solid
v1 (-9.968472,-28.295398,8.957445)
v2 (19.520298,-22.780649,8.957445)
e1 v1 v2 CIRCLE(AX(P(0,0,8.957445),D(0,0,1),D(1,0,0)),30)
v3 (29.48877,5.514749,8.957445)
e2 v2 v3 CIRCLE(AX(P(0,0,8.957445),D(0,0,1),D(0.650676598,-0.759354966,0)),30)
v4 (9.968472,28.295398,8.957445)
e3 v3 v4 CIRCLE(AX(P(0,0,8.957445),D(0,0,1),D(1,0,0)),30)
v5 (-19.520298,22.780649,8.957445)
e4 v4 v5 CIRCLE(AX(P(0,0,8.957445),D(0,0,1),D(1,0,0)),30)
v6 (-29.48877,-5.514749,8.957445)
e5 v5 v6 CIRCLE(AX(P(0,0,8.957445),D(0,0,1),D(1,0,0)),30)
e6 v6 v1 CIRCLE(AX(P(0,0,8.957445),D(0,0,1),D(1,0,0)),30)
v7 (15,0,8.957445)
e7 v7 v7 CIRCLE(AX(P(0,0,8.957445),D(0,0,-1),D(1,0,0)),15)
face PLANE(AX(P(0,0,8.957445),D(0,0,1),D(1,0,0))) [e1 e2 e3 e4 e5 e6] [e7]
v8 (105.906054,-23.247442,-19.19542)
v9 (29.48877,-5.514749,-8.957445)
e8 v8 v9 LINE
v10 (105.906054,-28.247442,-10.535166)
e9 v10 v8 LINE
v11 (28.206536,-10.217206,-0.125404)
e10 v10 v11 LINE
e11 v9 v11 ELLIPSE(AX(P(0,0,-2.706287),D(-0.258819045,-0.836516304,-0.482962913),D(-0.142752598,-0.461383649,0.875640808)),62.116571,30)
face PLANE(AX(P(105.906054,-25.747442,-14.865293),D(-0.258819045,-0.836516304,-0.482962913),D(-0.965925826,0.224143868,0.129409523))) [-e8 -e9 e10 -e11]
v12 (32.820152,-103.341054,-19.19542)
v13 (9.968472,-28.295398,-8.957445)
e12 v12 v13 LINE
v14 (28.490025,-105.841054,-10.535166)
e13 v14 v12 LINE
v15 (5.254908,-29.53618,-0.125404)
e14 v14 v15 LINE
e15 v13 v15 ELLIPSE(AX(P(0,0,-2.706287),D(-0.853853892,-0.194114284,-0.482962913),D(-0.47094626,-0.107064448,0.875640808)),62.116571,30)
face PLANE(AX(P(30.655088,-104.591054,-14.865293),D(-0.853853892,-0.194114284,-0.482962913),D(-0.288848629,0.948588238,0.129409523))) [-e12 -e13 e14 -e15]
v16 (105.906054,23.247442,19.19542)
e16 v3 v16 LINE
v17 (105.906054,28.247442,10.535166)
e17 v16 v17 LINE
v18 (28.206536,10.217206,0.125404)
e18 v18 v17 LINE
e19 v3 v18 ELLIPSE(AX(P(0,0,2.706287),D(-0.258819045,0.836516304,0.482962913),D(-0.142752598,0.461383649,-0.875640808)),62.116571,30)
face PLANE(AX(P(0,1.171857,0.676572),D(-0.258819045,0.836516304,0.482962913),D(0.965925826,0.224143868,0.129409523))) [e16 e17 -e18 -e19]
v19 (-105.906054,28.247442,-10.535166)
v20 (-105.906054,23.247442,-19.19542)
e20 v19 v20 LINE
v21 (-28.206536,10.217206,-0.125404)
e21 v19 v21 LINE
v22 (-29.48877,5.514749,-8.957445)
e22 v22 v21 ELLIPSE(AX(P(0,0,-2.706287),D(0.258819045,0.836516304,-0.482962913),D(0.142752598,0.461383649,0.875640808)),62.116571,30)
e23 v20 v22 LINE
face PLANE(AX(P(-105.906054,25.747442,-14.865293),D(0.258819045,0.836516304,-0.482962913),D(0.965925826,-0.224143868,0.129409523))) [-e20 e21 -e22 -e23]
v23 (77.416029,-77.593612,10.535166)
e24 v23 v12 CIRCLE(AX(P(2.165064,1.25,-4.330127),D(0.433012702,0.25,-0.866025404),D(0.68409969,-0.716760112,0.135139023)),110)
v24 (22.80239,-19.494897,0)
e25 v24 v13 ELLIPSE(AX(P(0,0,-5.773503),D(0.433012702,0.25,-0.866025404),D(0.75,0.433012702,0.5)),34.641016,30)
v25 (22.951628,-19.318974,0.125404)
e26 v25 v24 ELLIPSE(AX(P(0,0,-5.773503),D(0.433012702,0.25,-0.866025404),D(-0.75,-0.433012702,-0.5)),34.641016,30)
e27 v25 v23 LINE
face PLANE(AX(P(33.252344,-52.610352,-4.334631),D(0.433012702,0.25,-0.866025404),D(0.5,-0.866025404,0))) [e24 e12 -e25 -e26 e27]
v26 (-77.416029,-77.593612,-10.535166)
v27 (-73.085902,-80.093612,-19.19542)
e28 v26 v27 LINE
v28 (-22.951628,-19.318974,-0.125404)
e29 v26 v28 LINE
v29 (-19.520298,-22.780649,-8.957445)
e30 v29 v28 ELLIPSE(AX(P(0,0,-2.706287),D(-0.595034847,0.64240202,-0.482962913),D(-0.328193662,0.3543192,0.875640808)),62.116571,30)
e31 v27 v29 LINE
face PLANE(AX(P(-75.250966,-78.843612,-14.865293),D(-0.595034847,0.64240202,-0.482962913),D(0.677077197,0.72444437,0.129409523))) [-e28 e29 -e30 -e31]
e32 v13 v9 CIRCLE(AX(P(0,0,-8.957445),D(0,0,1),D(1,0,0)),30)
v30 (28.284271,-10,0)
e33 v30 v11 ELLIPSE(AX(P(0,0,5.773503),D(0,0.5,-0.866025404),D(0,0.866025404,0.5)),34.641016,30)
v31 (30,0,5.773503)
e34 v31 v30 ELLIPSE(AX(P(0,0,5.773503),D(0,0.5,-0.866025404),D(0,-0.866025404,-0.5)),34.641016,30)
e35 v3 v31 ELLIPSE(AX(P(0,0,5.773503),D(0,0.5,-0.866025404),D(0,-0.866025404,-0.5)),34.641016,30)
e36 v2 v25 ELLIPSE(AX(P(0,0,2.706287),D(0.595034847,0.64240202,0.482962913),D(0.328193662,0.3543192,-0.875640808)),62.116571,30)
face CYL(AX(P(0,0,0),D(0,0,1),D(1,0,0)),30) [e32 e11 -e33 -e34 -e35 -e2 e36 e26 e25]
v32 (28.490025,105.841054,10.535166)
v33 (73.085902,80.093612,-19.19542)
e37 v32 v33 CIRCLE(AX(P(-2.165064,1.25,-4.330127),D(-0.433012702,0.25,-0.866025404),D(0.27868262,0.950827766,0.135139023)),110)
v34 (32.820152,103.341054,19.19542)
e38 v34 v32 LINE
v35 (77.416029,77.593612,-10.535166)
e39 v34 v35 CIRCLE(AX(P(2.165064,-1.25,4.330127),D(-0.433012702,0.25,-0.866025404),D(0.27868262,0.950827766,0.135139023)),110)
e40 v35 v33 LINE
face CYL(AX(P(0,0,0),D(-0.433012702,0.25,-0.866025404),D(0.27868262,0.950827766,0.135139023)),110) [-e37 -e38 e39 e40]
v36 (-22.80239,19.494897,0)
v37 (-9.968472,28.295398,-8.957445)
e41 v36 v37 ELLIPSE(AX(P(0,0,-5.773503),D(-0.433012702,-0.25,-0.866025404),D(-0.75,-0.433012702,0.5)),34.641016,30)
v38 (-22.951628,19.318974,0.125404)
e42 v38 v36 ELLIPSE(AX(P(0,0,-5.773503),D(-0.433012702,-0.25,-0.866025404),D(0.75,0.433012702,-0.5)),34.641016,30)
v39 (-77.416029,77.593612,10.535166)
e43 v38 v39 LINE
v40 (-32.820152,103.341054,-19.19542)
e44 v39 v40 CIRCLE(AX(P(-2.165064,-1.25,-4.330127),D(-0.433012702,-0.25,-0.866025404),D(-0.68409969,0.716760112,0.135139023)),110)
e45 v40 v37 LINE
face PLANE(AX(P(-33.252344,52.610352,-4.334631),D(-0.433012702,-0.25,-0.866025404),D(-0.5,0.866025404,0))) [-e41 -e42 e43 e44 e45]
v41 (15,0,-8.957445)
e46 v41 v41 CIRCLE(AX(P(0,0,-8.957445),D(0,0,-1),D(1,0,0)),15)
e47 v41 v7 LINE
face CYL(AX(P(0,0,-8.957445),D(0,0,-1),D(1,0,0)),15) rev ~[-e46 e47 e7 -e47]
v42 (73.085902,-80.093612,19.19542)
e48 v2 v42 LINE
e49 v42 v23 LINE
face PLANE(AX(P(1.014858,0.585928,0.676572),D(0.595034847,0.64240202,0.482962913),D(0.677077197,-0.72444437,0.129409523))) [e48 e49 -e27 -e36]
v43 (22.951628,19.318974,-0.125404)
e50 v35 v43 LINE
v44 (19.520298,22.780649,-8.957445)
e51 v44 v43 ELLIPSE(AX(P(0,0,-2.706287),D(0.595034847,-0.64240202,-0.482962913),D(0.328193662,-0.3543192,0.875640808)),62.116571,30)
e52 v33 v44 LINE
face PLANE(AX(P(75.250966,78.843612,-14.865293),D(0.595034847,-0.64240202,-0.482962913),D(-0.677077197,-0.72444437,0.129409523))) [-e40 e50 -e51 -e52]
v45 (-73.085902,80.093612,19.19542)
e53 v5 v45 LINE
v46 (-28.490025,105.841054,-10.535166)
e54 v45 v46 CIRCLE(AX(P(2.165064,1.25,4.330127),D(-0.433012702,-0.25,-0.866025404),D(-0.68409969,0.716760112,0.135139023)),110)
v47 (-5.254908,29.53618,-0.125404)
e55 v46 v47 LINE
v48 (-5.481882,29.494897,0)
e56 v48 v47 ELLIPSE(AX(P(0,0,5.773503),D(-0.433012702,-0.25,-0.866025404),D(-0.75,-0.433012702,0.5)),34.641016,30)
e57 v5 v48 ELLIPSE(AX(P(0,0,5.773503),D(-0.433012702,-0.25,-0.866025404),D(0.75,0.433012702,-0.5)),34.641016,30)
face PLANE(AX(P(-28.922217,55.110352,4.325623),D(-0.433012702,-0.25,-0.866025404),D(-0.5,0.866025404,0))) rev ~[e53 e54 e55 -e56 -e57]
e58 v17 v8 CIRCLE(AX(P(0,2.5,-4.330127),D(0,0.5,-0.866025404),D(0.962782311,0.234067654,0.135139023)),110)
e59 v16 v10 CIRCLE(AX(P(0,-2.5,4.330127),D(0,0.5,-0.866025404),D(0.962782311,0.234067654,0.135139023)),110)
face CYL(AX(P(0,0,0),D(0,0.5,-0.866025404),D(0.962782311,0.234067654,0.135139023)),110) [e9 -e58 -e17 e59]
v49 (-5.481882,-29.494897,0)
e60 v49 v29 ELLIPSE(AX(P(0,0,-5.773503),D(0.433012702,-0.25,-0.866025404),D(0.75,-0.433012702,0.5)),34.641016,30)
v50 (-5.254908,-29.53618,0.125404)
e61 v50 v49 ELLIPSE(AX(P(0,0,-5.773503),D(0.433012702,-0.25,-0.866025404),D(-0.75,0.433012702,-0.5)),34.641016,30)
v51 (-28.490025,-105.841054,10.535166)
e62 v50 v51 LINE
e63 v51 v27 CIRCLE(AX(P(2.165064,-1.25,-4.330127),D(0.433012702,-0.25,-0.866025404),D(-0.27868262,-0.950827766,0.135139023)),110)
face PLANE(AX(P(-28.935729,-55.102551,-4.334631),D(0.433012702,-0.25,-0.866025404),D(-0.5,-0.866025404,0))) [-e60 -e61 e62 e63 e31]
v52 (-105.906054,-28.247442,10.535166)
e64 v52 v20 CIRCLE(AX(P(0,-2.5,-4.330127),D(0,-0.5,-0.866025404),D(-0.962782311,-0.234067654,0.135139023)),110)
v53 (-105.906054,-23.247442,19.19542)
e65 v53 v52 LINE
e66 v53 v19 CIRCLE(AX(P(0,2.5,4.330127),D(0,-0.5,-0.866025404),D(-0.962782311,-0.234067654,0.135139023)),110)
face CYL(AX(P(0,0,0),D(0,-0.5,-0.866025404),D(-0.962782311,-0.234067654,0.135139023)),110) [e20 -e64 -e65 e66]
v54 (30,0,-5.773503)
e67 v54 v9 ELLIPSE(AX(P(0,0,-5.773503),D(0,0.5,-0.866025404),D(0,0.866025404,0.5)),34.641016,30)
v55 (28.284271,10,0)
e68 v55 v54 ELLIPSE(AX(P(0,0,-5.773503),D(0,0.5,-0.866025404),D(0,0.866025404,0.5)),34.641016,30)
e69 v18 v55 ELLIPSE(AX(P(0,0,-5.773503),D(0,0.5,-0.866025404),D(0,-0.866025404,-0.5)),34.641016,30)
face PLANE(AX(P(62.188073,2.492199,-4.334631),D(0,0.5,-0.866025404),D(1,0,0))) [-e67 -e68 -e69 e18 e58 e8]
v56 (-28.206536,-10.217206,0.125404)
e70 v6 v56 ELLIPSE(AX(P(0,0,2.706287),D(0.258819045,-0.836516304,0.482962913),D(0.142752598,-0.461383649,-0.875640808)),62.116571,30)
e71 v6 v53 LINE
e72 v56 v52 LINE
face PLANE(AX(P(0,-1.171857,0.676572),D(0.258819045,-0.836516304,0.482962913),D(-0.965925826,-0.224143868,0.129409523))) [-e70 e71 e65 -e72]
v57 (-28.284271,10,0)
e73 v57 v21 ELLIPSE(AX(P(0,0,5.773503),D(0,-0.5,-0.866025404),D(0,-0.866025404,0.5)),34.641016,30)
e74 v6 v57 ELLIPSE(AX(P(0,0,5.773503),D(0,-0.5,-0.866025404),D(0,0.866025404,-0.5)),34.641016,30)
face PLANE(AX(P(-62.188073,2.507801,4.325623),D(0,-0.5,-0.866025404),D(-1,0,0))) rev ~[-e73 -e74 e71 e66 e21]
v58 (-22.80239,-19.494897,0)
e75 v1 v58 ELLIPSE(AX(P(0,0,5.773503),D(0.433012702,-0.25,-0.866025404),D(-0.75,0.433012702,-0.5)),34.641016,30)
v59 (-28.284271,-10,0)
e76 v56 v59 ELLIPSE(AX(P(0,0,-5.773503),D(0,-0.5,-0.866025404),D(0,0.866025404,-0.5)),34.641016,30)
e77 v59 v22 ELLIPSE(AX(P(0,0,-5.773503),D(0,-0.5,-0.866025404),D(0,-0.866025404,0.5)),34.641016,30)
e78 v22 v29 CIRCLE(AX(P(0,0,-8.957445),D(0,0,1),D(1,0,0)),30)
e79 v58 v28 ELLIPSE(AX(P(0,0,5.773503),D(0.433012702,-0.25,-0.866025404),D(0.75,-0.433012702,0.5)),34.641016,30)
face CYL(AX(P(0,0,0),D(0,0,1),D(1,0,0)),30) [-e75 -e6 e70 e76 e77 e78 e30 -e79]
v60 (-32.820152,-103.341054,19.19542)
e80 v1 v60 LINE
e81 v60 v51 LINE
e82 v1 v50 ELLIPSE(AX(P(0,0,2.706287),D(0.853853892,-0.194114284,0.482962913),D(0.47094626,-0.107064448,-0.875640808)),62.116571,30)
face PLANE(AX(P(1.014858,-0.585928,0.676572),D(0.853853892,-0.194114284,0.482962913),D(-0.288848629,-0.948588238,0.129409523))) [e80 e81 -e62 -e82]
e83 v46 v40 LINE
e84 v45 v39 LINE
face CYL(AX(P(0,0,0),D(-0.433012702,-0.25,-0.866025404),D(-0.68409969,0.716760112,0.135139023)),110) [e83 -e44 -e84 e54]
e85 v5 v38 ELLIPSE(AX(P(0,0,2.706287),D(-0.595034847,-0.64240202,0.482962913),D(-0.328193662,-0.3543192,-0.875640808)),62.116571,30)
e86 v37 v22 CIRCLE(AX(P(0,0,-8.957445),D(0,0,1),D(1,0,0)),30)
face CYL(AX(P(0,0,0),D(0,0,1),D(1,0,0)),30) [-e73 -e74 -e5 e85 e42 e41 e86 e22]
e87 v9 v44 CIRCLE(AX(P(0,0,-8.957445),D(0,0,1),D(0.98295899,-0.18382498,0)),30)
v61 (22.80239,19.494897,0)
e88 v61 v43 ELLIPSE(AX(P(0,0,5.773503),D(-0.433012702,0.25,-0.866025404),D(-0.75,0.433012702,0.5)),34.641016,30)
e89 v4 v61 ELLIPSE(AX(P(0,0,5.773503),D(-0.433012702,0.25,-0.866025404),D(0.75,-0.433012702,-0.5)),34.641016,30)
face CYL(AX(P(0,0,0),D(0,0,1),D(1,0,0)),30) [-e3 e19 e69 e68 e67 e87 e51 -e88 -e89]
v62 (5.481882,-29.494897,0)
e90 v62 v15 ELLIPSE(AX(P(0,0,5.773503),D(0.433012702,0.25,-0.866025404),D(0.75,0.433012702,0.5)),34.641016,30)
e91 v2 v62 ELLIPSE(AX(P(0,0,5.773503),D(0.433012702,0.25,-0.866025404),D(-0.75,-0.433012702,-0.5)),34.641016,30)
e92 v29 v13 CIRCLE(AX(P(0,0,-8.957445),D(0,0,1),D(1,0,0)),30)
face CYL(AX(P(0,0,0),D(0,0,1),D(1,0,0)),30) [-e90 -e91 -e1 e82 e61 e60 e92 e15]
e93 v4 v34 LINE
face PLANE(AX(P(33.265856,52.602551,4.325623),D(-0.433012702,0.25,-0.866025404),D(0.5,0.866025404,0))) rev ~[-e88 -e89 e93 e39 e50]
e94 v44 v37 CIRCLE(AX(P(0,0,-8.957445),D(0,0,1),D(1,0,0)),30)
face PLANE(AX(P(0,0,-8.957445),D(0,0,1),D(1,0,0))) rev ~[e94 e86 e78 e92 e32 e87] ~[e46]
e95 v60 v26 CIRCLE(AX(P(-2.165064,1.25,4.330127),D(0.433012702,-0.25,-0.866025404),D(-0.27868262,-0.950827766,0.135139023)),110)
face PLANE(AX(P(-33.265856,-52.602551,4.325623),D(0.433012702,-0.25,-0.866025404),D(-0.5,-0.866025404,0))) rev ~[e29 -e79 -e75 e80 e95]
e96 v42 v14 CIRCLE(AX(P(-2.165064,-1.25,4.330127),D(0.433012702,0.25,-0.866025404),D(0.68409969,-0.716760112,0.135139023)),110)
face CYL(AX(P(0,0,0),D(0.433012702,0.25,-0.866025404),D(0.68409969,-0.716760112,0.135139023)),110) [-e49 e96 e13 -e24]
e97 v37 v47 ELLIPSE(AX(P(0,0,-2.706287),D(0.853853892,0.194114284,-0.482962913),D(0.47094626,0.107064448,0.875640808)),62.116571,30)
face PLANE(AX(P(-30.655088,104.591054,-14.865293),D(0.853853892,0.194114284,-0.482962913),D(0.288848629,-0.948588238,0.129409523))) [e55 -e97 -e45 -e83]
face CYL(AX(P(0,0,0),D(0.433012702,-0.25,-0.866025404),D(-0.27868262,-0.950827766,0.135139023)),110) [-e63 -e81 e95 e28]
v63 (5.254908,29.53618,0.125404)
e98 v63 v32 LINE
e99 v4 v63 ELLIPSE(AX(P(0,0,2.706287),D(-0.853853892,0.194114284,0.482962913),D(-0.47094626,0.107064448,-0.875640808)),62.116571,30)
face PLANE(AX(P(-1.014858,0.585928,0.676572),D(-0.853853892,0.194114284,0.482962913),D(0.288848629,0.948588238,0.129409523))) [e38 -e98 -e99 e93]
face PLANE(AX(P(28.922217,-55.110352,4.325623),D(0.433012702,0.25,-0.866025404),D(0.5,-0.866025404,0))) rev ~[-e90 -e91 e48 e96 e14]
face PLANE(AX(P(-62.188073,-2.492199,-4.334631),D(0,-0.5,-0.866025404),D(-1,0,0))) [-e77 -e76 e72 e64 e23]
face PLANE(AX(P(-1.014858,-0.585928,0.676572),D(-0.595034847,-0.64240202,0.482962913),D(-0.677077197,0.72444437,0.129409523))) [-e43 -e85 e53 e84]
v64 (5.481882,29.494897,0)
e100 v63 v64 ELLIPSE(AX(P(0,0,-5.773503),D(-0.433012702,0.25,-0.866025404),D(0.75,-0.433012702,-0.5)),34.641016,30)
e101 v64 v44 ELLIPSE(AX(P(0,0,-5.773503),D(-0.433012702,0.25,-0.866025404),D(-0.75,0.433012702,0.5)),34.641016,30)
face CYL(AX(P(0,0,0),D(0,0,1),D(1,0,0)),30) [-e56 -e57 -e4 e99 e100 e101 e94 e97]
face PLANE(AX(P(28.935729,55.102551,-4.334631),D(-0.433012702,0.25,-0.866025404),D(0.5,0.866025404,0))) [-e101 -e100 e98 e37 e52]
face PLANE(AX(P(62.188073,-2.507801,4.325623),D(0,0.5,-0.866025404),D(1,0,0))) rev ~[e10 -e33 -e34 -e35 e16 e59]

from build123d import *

# Parameters (mm, degrees)
F3_DEPTH      = 5
F3_DEPTH_BACK = 5
F5_COUNT      = 6
F6_R          = 30
F7_DEPTH      = 20
F7_DEPTH_BACK = 20
F9_R          = 30
F10_DEPTH     = 25
F12_R         = 30
F13_DEPTH     = 25
F14_R         = 15
F15_DEPTH     = 25


with BuildPart() as f3:
    # F2 (on face) → F3 (new body, two sides)
    with BuildSketch(Plane(origin=(0, 0, 0), x_dir=(1, 0, 0), z_dir=(0, 0.5, -0.8660254038))) as f3_sk:
        with BuildLine():
            Line((0, -1.3531434218), (105.9060541663, -29.7305851092))
            ThreePointArc((105.9060541663, -29.7305851092), (110, 0), (105.9060541663, 29.7305851092))
            Line((105.9060541663, 29.7305851092), (-5.05, 0))
            Line((-5.05, 0), (0, 0))
            Line((0, 0), (0, -1.3531434218))
        make_face()
    extrude(amount=F3_DEPTH)
    extrude(f3_sk.sketch, amount=-F3_DEPTH_BACK)

    # F5: F3 ×6 about axis
    f5_axis = Axis((0, 0, 14.0805), (0, 0, 1))


with BuildPart() as f3_1:
    add(f3.part)
    for i in range(1, F5_COUNT):
        add(f3.part.rotate(f5_axis, i * 360 / F5_COUNT))

    # F6 (on Top) → F7 (join, two sides)
    with BuildSketch(Plane.XY) as f7_sk:
        Circle(F6_R)
    extrude(amount=F7_DEPTH)
    extrude(f7_sk.sketch, amount=-F7_DEPTH_BACK)

    # F9 (on plane+point) → F10 (cut)
    with BuildSketch(Plane.XY.offset(8.9574447446)):
        Circle(F9_R)
    extrude(amount=F10_DEPTH, mode=Mode.SUBTRACT)

    # F12 (on plane+point) → F13 (cut)
    with BuildSketch(Plane.XY.offset(-8.9574447446)):
        Circle(F12_R)
    extrude(amount=-F13_DEPTH, mode=Mode.SUBTRACT)

    # F14 (on face) → F15 (cut)
    with BuildSketch(Plane(origin=(0, 0, -8.9574447446), x_dir=(1, 0, 0), z_dir=(0, 0, -1))):
        Circle(F14_R)
    extrude(amount=-F15_DEPTH, mode=Mode.SUBTRACT)


solid = f3_1.part
